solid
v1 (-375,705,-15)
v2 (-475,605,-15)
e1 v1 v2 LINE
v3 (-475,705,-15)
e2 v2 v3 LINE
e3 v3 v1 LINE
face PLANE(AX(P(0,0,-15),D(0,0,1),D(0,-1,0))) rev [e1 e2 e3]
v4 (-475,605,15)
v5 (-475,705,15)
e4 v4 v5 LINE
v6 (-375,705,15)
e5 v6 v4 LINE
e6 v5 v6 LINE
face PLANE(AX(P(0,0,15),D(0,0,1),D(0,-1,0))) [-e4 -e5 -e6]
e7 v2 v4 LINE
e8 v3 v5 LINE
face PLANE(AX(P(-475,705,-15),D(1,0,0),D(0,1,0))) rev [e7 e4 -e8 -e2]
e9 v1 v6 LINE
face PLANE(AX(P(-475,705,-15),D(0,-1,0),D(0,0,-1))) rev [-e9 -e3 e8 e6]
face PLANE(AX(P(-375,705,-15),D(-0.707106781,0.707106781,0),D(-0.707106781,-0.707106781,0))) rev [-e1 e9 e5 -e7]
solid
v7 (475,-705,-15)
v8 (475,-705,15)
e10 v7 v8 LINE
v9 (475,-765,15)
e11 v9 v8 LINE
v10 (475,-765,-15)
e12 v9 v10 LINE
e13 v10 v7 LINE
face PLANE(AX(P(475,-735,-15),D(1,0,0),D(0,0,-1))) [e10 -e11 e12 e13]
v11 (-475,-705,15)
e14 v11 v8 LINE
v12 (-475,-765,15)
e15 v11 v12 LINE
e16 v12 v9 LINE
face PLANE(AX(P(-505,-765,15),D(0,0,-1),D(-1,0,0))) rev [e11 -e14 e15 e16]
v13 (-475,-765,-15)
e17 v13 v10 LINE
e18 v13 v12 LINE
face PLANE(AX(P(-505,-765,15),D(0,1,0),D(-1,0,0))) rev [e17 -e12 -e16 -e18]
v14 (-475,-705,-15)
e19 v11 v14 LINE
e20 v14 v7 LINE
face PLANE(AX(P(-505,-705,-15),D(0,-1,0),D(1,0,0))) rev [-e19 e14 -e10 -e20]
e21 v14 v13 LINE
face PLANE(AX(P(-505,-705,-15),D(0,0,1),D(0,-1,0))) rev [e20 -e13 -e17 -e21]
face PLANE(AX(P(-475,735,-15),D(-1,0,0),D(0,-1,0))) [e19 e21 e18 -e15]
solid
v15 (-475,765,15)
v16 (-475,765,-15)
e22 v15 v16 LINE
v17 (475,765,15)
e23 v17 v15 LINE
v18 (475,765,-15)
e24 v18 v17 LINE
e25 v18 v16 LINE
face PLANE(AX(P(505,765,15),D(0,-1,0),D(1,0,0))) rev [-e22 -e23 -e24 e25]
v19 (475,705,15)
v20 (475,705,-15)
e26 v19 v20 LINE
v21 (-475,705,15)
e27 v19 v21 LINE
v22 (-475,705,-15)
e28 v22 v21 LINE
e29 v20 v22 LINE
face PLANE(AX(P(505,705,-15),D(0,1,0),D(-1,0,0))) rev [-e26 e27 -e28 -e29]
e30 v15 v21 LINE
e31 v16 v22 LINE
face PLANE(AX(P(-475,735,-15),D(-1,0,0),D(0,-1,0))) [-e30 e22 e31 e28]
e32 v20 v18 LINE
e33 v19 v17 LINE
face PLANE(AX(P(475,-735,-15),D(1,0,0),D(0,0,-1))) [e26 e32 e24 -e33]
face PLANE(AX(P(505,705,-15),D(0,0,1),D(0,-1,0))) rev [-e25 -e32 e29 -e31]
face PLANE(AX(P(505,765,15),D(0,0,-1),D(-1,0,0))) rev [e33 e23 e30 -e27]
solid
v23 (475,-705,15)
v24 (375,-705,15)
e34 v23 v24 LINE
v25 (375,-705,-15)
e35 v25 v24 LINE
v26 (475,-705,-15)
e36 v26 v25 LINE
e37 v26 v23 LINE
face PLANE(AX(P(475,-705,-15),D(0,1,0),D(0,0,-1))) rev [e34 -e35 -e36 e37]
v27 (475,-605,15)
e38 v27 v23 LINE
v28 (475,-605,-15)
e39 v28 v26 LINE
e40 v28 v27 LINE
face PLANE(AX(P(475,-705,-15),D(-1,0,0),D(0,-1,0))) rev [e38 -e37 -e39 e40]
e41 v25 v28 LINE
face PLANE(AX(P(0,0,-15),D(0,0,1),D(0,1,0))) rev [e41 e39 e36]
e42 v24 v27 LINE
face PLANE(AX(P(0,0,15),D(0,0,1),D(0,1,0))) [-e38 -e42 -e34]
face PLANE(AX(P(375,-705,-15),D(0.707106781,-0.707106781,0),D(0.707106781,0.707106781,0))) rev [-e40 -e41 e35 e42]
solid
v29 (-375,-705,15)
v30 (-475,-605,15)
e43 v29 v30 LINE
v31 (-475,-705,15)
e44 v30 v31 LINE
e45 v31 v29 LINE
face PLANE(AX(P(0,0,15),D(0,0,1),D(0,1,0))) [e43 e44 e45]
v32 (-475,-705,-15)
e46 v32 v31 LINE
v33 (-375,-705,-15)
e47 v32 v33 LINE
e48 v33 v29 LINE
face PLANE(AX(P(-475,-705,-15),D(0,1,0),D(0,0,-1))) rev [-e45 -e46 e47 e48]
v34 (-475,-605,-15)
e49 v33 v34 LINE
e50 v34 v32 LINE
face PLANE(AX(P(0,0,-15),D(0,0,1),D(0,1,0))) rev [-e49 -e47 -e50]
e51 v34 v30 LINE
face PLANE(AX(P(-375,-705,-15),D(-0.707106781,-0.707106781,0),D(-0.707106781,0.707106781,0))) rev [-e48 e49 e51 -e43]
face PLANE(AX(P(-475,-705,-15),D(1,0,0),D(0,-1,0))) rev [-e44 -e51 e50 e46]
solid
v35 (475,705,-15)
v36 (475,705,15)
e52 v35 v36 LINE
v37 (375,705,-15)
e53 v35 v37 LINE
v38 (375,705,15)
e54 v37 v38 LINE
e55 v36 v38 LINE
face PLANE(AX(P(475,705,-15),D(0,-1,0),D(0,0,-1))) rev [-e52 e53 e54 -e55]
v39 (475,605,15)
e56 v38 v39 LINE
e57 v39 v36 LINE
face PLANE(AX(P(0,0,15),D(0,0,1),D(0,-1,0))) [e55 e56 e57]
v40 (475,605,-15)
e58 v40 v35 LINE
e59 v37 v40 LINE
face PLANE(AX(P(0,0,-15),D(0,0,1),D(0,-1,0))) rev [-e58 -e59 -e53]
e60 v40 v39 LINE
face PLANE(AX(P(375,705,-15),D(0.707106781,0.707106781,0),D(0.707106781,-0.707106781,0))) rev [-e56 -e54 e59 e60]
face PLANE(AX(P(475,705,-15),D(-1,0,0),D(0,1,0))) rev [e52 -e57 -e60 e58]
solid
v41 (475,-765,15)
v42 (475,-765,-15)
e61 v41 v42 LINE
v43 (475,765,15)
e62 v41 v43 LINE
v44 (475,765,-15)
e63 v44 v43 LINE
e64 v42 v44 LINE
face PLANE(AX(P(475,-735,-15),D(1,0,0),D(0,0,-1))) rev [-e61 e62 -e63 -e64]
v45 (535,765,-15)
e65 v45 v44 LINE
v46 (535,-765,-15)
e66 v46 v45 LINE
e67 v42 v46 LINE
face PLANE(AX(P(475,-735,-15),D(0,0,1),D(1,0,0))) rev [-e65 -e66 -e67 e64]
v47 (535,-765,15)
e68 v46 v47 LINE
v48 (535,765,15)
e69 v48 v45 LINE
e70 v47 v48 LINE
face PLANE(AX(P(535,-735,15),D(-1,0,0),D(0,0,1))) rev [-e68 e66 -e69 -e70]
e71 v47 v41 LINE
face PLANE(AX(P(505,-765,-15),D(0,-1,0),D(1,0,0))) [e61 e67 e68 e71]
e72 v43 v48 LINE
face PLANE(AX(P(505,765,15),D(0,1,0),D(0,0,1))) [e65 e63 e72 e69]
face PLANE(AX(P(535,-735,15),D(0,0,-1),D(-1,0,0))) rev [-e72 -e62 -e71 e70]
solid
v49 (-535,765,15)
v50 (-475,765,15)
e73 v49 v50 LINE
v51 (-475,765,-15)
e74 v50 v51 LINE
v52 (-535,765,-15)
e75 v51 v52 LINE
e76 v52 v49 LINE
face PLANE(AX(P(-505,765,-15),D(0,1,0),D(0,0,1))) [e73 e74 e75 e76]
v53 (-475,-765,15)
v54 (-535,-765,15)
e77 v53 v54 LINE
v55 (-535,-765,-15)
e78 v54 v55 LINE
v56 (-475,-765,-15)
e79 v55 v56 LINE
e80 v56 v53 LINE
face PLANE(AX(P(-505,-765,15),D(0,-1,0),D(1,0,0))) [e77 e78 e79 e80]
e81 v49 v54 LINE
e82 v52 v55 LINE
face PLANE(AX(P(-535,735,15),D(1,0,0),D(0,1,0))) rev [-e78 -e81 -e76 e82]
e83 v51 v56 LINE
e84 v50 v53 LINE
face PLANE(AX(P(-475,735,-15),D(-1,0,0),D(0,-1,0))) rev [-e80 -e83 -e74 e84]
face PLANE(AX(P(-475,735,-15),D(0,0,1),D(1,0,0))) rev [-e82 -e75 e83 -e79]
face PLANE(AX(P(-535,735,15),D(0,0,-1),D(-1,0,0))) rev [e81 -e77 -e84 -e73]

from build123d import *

# Parameters (mm, degrees)
MEMBER_START                 = -765
MEMBER_20_X_20_1_OUTLINE_W   = 60
MEMBER_20_X_20_1_OUTLINE_H   = 30
MEMBER_20_X_20_1_DEPTH       = 1530
MEMBER_20_X_20_1_2_OUTLINE_W = 950
MEMBER_20_X_20_1_2_OUTLINE_H = 30
MEMBER_20_X_20_1_2_DEPTH     = 60
MEMBER_START_2               = 705
MEMBER_20_X_20_1_3_OUTLINE_W = 950
MEMBER_20_X_20_1_3_OUTLINE_H = 30
MEMBER_20_X_20_1_3_DEPTH     = 60
GUSSET_1_THICKNESS           = 30


# Read off the part's stored shape, not the designer's step: Квадрат 20 X 20(1)
with BuildPart() as part:
    # Member 20 X 20_1 outline → Member 20 X 20_1 (new body)
    with BuildSketch(Plane(origin=(0, 0, 0), x_dir=(1, 0, 0), z_dir=(0, 1, 0)).offset(MEMBER_START)):
        with Locations((505, 0)):
            Rectangle(MEMBER_20_X_20_1_OUTLINE_W, MEMBER_20_X_20_1_OUTLINE_H)
        with Locations((-505, 0)):
            Rectangle(MEMBER_20_X_20_1_OUTLINE_W, MEMBER_20_X_20_1_OUTLINE_H)
    extrude(amount=MEMBER_20_X_20_1_DEPTH)


with BuildPart() as body_2:
    # Member 20 X 20_1 2 outline → Member 20 X 20_1 2 (new body)
    with BuildSketch(Plane(origin=(0, 0, 0), x_dir=(1, 0, 0), z_dir=(0, 1, 0)).offset(MEMBER_START)):
        Rectangle(MEMBER_20_X_20_1_2_OUTLINE_W, MEMBER_20_X_20_1_2_OUTLINE_H)
    extrude(amount=MEMBER_20_X_20_1_2_DEPTH)


with BuildPart() as body_3:
    # Member 20 X 20_1 3 outline → Member 20 X 20_1 3 (new body)
    with BuildSketch(Plane(origin=(0, 0, 0), x_dir=(1, 0, 0), z_dir=(0, 1, 0)).offset(MEMBER_START_2)):
        Rectangle(MEMBER_20_X_20_1_3_OUTLINE_W, MEMBER_20_X_20_1_3_OUTLINE_H)
    extrude(amount=MEMBER_20_X_20_1_3_DEPTH)


with BuildPart() as body_4:
    # Gusset 1: a gusset: a plate 30.0 thick in the corner of two members, its outline drawn in place
    gusset_1_outline = Wire([Line((-475, 705, -15), (-375, 705, -15)), Line((-375, 705, -15), (-475, 605, -15)), Line((-475, 605, -15), (-475, 705, -15))])
    add(extrude(Face(gusset_1_outline), amount=GUSSET_1_THICKNESS, dir=(0, 0, 1)))


with BuildPart() as body_5:
    # Зеркальное отражение2: mirrored copy
    add(body_4.part.mirror(Plane(origin=(0, 0, 0), x_dir=(0, 0, 1), z_dir=(1, 0, 0))))


with BuildPart() as body_6:
    # Зеркальное отражение3: mirrored copy
    add(body_4.part.mirror(Plane.ZX))


with BuildPart() as body_7:
    # Mirror 3 2: mirrored copy
    add(body_5.part.mirror(Plane.ZX))


solid = Compound([part.part, body_2.part, body_3.part, body_4.part, body_5.part, body_6.part, body_7.part])
